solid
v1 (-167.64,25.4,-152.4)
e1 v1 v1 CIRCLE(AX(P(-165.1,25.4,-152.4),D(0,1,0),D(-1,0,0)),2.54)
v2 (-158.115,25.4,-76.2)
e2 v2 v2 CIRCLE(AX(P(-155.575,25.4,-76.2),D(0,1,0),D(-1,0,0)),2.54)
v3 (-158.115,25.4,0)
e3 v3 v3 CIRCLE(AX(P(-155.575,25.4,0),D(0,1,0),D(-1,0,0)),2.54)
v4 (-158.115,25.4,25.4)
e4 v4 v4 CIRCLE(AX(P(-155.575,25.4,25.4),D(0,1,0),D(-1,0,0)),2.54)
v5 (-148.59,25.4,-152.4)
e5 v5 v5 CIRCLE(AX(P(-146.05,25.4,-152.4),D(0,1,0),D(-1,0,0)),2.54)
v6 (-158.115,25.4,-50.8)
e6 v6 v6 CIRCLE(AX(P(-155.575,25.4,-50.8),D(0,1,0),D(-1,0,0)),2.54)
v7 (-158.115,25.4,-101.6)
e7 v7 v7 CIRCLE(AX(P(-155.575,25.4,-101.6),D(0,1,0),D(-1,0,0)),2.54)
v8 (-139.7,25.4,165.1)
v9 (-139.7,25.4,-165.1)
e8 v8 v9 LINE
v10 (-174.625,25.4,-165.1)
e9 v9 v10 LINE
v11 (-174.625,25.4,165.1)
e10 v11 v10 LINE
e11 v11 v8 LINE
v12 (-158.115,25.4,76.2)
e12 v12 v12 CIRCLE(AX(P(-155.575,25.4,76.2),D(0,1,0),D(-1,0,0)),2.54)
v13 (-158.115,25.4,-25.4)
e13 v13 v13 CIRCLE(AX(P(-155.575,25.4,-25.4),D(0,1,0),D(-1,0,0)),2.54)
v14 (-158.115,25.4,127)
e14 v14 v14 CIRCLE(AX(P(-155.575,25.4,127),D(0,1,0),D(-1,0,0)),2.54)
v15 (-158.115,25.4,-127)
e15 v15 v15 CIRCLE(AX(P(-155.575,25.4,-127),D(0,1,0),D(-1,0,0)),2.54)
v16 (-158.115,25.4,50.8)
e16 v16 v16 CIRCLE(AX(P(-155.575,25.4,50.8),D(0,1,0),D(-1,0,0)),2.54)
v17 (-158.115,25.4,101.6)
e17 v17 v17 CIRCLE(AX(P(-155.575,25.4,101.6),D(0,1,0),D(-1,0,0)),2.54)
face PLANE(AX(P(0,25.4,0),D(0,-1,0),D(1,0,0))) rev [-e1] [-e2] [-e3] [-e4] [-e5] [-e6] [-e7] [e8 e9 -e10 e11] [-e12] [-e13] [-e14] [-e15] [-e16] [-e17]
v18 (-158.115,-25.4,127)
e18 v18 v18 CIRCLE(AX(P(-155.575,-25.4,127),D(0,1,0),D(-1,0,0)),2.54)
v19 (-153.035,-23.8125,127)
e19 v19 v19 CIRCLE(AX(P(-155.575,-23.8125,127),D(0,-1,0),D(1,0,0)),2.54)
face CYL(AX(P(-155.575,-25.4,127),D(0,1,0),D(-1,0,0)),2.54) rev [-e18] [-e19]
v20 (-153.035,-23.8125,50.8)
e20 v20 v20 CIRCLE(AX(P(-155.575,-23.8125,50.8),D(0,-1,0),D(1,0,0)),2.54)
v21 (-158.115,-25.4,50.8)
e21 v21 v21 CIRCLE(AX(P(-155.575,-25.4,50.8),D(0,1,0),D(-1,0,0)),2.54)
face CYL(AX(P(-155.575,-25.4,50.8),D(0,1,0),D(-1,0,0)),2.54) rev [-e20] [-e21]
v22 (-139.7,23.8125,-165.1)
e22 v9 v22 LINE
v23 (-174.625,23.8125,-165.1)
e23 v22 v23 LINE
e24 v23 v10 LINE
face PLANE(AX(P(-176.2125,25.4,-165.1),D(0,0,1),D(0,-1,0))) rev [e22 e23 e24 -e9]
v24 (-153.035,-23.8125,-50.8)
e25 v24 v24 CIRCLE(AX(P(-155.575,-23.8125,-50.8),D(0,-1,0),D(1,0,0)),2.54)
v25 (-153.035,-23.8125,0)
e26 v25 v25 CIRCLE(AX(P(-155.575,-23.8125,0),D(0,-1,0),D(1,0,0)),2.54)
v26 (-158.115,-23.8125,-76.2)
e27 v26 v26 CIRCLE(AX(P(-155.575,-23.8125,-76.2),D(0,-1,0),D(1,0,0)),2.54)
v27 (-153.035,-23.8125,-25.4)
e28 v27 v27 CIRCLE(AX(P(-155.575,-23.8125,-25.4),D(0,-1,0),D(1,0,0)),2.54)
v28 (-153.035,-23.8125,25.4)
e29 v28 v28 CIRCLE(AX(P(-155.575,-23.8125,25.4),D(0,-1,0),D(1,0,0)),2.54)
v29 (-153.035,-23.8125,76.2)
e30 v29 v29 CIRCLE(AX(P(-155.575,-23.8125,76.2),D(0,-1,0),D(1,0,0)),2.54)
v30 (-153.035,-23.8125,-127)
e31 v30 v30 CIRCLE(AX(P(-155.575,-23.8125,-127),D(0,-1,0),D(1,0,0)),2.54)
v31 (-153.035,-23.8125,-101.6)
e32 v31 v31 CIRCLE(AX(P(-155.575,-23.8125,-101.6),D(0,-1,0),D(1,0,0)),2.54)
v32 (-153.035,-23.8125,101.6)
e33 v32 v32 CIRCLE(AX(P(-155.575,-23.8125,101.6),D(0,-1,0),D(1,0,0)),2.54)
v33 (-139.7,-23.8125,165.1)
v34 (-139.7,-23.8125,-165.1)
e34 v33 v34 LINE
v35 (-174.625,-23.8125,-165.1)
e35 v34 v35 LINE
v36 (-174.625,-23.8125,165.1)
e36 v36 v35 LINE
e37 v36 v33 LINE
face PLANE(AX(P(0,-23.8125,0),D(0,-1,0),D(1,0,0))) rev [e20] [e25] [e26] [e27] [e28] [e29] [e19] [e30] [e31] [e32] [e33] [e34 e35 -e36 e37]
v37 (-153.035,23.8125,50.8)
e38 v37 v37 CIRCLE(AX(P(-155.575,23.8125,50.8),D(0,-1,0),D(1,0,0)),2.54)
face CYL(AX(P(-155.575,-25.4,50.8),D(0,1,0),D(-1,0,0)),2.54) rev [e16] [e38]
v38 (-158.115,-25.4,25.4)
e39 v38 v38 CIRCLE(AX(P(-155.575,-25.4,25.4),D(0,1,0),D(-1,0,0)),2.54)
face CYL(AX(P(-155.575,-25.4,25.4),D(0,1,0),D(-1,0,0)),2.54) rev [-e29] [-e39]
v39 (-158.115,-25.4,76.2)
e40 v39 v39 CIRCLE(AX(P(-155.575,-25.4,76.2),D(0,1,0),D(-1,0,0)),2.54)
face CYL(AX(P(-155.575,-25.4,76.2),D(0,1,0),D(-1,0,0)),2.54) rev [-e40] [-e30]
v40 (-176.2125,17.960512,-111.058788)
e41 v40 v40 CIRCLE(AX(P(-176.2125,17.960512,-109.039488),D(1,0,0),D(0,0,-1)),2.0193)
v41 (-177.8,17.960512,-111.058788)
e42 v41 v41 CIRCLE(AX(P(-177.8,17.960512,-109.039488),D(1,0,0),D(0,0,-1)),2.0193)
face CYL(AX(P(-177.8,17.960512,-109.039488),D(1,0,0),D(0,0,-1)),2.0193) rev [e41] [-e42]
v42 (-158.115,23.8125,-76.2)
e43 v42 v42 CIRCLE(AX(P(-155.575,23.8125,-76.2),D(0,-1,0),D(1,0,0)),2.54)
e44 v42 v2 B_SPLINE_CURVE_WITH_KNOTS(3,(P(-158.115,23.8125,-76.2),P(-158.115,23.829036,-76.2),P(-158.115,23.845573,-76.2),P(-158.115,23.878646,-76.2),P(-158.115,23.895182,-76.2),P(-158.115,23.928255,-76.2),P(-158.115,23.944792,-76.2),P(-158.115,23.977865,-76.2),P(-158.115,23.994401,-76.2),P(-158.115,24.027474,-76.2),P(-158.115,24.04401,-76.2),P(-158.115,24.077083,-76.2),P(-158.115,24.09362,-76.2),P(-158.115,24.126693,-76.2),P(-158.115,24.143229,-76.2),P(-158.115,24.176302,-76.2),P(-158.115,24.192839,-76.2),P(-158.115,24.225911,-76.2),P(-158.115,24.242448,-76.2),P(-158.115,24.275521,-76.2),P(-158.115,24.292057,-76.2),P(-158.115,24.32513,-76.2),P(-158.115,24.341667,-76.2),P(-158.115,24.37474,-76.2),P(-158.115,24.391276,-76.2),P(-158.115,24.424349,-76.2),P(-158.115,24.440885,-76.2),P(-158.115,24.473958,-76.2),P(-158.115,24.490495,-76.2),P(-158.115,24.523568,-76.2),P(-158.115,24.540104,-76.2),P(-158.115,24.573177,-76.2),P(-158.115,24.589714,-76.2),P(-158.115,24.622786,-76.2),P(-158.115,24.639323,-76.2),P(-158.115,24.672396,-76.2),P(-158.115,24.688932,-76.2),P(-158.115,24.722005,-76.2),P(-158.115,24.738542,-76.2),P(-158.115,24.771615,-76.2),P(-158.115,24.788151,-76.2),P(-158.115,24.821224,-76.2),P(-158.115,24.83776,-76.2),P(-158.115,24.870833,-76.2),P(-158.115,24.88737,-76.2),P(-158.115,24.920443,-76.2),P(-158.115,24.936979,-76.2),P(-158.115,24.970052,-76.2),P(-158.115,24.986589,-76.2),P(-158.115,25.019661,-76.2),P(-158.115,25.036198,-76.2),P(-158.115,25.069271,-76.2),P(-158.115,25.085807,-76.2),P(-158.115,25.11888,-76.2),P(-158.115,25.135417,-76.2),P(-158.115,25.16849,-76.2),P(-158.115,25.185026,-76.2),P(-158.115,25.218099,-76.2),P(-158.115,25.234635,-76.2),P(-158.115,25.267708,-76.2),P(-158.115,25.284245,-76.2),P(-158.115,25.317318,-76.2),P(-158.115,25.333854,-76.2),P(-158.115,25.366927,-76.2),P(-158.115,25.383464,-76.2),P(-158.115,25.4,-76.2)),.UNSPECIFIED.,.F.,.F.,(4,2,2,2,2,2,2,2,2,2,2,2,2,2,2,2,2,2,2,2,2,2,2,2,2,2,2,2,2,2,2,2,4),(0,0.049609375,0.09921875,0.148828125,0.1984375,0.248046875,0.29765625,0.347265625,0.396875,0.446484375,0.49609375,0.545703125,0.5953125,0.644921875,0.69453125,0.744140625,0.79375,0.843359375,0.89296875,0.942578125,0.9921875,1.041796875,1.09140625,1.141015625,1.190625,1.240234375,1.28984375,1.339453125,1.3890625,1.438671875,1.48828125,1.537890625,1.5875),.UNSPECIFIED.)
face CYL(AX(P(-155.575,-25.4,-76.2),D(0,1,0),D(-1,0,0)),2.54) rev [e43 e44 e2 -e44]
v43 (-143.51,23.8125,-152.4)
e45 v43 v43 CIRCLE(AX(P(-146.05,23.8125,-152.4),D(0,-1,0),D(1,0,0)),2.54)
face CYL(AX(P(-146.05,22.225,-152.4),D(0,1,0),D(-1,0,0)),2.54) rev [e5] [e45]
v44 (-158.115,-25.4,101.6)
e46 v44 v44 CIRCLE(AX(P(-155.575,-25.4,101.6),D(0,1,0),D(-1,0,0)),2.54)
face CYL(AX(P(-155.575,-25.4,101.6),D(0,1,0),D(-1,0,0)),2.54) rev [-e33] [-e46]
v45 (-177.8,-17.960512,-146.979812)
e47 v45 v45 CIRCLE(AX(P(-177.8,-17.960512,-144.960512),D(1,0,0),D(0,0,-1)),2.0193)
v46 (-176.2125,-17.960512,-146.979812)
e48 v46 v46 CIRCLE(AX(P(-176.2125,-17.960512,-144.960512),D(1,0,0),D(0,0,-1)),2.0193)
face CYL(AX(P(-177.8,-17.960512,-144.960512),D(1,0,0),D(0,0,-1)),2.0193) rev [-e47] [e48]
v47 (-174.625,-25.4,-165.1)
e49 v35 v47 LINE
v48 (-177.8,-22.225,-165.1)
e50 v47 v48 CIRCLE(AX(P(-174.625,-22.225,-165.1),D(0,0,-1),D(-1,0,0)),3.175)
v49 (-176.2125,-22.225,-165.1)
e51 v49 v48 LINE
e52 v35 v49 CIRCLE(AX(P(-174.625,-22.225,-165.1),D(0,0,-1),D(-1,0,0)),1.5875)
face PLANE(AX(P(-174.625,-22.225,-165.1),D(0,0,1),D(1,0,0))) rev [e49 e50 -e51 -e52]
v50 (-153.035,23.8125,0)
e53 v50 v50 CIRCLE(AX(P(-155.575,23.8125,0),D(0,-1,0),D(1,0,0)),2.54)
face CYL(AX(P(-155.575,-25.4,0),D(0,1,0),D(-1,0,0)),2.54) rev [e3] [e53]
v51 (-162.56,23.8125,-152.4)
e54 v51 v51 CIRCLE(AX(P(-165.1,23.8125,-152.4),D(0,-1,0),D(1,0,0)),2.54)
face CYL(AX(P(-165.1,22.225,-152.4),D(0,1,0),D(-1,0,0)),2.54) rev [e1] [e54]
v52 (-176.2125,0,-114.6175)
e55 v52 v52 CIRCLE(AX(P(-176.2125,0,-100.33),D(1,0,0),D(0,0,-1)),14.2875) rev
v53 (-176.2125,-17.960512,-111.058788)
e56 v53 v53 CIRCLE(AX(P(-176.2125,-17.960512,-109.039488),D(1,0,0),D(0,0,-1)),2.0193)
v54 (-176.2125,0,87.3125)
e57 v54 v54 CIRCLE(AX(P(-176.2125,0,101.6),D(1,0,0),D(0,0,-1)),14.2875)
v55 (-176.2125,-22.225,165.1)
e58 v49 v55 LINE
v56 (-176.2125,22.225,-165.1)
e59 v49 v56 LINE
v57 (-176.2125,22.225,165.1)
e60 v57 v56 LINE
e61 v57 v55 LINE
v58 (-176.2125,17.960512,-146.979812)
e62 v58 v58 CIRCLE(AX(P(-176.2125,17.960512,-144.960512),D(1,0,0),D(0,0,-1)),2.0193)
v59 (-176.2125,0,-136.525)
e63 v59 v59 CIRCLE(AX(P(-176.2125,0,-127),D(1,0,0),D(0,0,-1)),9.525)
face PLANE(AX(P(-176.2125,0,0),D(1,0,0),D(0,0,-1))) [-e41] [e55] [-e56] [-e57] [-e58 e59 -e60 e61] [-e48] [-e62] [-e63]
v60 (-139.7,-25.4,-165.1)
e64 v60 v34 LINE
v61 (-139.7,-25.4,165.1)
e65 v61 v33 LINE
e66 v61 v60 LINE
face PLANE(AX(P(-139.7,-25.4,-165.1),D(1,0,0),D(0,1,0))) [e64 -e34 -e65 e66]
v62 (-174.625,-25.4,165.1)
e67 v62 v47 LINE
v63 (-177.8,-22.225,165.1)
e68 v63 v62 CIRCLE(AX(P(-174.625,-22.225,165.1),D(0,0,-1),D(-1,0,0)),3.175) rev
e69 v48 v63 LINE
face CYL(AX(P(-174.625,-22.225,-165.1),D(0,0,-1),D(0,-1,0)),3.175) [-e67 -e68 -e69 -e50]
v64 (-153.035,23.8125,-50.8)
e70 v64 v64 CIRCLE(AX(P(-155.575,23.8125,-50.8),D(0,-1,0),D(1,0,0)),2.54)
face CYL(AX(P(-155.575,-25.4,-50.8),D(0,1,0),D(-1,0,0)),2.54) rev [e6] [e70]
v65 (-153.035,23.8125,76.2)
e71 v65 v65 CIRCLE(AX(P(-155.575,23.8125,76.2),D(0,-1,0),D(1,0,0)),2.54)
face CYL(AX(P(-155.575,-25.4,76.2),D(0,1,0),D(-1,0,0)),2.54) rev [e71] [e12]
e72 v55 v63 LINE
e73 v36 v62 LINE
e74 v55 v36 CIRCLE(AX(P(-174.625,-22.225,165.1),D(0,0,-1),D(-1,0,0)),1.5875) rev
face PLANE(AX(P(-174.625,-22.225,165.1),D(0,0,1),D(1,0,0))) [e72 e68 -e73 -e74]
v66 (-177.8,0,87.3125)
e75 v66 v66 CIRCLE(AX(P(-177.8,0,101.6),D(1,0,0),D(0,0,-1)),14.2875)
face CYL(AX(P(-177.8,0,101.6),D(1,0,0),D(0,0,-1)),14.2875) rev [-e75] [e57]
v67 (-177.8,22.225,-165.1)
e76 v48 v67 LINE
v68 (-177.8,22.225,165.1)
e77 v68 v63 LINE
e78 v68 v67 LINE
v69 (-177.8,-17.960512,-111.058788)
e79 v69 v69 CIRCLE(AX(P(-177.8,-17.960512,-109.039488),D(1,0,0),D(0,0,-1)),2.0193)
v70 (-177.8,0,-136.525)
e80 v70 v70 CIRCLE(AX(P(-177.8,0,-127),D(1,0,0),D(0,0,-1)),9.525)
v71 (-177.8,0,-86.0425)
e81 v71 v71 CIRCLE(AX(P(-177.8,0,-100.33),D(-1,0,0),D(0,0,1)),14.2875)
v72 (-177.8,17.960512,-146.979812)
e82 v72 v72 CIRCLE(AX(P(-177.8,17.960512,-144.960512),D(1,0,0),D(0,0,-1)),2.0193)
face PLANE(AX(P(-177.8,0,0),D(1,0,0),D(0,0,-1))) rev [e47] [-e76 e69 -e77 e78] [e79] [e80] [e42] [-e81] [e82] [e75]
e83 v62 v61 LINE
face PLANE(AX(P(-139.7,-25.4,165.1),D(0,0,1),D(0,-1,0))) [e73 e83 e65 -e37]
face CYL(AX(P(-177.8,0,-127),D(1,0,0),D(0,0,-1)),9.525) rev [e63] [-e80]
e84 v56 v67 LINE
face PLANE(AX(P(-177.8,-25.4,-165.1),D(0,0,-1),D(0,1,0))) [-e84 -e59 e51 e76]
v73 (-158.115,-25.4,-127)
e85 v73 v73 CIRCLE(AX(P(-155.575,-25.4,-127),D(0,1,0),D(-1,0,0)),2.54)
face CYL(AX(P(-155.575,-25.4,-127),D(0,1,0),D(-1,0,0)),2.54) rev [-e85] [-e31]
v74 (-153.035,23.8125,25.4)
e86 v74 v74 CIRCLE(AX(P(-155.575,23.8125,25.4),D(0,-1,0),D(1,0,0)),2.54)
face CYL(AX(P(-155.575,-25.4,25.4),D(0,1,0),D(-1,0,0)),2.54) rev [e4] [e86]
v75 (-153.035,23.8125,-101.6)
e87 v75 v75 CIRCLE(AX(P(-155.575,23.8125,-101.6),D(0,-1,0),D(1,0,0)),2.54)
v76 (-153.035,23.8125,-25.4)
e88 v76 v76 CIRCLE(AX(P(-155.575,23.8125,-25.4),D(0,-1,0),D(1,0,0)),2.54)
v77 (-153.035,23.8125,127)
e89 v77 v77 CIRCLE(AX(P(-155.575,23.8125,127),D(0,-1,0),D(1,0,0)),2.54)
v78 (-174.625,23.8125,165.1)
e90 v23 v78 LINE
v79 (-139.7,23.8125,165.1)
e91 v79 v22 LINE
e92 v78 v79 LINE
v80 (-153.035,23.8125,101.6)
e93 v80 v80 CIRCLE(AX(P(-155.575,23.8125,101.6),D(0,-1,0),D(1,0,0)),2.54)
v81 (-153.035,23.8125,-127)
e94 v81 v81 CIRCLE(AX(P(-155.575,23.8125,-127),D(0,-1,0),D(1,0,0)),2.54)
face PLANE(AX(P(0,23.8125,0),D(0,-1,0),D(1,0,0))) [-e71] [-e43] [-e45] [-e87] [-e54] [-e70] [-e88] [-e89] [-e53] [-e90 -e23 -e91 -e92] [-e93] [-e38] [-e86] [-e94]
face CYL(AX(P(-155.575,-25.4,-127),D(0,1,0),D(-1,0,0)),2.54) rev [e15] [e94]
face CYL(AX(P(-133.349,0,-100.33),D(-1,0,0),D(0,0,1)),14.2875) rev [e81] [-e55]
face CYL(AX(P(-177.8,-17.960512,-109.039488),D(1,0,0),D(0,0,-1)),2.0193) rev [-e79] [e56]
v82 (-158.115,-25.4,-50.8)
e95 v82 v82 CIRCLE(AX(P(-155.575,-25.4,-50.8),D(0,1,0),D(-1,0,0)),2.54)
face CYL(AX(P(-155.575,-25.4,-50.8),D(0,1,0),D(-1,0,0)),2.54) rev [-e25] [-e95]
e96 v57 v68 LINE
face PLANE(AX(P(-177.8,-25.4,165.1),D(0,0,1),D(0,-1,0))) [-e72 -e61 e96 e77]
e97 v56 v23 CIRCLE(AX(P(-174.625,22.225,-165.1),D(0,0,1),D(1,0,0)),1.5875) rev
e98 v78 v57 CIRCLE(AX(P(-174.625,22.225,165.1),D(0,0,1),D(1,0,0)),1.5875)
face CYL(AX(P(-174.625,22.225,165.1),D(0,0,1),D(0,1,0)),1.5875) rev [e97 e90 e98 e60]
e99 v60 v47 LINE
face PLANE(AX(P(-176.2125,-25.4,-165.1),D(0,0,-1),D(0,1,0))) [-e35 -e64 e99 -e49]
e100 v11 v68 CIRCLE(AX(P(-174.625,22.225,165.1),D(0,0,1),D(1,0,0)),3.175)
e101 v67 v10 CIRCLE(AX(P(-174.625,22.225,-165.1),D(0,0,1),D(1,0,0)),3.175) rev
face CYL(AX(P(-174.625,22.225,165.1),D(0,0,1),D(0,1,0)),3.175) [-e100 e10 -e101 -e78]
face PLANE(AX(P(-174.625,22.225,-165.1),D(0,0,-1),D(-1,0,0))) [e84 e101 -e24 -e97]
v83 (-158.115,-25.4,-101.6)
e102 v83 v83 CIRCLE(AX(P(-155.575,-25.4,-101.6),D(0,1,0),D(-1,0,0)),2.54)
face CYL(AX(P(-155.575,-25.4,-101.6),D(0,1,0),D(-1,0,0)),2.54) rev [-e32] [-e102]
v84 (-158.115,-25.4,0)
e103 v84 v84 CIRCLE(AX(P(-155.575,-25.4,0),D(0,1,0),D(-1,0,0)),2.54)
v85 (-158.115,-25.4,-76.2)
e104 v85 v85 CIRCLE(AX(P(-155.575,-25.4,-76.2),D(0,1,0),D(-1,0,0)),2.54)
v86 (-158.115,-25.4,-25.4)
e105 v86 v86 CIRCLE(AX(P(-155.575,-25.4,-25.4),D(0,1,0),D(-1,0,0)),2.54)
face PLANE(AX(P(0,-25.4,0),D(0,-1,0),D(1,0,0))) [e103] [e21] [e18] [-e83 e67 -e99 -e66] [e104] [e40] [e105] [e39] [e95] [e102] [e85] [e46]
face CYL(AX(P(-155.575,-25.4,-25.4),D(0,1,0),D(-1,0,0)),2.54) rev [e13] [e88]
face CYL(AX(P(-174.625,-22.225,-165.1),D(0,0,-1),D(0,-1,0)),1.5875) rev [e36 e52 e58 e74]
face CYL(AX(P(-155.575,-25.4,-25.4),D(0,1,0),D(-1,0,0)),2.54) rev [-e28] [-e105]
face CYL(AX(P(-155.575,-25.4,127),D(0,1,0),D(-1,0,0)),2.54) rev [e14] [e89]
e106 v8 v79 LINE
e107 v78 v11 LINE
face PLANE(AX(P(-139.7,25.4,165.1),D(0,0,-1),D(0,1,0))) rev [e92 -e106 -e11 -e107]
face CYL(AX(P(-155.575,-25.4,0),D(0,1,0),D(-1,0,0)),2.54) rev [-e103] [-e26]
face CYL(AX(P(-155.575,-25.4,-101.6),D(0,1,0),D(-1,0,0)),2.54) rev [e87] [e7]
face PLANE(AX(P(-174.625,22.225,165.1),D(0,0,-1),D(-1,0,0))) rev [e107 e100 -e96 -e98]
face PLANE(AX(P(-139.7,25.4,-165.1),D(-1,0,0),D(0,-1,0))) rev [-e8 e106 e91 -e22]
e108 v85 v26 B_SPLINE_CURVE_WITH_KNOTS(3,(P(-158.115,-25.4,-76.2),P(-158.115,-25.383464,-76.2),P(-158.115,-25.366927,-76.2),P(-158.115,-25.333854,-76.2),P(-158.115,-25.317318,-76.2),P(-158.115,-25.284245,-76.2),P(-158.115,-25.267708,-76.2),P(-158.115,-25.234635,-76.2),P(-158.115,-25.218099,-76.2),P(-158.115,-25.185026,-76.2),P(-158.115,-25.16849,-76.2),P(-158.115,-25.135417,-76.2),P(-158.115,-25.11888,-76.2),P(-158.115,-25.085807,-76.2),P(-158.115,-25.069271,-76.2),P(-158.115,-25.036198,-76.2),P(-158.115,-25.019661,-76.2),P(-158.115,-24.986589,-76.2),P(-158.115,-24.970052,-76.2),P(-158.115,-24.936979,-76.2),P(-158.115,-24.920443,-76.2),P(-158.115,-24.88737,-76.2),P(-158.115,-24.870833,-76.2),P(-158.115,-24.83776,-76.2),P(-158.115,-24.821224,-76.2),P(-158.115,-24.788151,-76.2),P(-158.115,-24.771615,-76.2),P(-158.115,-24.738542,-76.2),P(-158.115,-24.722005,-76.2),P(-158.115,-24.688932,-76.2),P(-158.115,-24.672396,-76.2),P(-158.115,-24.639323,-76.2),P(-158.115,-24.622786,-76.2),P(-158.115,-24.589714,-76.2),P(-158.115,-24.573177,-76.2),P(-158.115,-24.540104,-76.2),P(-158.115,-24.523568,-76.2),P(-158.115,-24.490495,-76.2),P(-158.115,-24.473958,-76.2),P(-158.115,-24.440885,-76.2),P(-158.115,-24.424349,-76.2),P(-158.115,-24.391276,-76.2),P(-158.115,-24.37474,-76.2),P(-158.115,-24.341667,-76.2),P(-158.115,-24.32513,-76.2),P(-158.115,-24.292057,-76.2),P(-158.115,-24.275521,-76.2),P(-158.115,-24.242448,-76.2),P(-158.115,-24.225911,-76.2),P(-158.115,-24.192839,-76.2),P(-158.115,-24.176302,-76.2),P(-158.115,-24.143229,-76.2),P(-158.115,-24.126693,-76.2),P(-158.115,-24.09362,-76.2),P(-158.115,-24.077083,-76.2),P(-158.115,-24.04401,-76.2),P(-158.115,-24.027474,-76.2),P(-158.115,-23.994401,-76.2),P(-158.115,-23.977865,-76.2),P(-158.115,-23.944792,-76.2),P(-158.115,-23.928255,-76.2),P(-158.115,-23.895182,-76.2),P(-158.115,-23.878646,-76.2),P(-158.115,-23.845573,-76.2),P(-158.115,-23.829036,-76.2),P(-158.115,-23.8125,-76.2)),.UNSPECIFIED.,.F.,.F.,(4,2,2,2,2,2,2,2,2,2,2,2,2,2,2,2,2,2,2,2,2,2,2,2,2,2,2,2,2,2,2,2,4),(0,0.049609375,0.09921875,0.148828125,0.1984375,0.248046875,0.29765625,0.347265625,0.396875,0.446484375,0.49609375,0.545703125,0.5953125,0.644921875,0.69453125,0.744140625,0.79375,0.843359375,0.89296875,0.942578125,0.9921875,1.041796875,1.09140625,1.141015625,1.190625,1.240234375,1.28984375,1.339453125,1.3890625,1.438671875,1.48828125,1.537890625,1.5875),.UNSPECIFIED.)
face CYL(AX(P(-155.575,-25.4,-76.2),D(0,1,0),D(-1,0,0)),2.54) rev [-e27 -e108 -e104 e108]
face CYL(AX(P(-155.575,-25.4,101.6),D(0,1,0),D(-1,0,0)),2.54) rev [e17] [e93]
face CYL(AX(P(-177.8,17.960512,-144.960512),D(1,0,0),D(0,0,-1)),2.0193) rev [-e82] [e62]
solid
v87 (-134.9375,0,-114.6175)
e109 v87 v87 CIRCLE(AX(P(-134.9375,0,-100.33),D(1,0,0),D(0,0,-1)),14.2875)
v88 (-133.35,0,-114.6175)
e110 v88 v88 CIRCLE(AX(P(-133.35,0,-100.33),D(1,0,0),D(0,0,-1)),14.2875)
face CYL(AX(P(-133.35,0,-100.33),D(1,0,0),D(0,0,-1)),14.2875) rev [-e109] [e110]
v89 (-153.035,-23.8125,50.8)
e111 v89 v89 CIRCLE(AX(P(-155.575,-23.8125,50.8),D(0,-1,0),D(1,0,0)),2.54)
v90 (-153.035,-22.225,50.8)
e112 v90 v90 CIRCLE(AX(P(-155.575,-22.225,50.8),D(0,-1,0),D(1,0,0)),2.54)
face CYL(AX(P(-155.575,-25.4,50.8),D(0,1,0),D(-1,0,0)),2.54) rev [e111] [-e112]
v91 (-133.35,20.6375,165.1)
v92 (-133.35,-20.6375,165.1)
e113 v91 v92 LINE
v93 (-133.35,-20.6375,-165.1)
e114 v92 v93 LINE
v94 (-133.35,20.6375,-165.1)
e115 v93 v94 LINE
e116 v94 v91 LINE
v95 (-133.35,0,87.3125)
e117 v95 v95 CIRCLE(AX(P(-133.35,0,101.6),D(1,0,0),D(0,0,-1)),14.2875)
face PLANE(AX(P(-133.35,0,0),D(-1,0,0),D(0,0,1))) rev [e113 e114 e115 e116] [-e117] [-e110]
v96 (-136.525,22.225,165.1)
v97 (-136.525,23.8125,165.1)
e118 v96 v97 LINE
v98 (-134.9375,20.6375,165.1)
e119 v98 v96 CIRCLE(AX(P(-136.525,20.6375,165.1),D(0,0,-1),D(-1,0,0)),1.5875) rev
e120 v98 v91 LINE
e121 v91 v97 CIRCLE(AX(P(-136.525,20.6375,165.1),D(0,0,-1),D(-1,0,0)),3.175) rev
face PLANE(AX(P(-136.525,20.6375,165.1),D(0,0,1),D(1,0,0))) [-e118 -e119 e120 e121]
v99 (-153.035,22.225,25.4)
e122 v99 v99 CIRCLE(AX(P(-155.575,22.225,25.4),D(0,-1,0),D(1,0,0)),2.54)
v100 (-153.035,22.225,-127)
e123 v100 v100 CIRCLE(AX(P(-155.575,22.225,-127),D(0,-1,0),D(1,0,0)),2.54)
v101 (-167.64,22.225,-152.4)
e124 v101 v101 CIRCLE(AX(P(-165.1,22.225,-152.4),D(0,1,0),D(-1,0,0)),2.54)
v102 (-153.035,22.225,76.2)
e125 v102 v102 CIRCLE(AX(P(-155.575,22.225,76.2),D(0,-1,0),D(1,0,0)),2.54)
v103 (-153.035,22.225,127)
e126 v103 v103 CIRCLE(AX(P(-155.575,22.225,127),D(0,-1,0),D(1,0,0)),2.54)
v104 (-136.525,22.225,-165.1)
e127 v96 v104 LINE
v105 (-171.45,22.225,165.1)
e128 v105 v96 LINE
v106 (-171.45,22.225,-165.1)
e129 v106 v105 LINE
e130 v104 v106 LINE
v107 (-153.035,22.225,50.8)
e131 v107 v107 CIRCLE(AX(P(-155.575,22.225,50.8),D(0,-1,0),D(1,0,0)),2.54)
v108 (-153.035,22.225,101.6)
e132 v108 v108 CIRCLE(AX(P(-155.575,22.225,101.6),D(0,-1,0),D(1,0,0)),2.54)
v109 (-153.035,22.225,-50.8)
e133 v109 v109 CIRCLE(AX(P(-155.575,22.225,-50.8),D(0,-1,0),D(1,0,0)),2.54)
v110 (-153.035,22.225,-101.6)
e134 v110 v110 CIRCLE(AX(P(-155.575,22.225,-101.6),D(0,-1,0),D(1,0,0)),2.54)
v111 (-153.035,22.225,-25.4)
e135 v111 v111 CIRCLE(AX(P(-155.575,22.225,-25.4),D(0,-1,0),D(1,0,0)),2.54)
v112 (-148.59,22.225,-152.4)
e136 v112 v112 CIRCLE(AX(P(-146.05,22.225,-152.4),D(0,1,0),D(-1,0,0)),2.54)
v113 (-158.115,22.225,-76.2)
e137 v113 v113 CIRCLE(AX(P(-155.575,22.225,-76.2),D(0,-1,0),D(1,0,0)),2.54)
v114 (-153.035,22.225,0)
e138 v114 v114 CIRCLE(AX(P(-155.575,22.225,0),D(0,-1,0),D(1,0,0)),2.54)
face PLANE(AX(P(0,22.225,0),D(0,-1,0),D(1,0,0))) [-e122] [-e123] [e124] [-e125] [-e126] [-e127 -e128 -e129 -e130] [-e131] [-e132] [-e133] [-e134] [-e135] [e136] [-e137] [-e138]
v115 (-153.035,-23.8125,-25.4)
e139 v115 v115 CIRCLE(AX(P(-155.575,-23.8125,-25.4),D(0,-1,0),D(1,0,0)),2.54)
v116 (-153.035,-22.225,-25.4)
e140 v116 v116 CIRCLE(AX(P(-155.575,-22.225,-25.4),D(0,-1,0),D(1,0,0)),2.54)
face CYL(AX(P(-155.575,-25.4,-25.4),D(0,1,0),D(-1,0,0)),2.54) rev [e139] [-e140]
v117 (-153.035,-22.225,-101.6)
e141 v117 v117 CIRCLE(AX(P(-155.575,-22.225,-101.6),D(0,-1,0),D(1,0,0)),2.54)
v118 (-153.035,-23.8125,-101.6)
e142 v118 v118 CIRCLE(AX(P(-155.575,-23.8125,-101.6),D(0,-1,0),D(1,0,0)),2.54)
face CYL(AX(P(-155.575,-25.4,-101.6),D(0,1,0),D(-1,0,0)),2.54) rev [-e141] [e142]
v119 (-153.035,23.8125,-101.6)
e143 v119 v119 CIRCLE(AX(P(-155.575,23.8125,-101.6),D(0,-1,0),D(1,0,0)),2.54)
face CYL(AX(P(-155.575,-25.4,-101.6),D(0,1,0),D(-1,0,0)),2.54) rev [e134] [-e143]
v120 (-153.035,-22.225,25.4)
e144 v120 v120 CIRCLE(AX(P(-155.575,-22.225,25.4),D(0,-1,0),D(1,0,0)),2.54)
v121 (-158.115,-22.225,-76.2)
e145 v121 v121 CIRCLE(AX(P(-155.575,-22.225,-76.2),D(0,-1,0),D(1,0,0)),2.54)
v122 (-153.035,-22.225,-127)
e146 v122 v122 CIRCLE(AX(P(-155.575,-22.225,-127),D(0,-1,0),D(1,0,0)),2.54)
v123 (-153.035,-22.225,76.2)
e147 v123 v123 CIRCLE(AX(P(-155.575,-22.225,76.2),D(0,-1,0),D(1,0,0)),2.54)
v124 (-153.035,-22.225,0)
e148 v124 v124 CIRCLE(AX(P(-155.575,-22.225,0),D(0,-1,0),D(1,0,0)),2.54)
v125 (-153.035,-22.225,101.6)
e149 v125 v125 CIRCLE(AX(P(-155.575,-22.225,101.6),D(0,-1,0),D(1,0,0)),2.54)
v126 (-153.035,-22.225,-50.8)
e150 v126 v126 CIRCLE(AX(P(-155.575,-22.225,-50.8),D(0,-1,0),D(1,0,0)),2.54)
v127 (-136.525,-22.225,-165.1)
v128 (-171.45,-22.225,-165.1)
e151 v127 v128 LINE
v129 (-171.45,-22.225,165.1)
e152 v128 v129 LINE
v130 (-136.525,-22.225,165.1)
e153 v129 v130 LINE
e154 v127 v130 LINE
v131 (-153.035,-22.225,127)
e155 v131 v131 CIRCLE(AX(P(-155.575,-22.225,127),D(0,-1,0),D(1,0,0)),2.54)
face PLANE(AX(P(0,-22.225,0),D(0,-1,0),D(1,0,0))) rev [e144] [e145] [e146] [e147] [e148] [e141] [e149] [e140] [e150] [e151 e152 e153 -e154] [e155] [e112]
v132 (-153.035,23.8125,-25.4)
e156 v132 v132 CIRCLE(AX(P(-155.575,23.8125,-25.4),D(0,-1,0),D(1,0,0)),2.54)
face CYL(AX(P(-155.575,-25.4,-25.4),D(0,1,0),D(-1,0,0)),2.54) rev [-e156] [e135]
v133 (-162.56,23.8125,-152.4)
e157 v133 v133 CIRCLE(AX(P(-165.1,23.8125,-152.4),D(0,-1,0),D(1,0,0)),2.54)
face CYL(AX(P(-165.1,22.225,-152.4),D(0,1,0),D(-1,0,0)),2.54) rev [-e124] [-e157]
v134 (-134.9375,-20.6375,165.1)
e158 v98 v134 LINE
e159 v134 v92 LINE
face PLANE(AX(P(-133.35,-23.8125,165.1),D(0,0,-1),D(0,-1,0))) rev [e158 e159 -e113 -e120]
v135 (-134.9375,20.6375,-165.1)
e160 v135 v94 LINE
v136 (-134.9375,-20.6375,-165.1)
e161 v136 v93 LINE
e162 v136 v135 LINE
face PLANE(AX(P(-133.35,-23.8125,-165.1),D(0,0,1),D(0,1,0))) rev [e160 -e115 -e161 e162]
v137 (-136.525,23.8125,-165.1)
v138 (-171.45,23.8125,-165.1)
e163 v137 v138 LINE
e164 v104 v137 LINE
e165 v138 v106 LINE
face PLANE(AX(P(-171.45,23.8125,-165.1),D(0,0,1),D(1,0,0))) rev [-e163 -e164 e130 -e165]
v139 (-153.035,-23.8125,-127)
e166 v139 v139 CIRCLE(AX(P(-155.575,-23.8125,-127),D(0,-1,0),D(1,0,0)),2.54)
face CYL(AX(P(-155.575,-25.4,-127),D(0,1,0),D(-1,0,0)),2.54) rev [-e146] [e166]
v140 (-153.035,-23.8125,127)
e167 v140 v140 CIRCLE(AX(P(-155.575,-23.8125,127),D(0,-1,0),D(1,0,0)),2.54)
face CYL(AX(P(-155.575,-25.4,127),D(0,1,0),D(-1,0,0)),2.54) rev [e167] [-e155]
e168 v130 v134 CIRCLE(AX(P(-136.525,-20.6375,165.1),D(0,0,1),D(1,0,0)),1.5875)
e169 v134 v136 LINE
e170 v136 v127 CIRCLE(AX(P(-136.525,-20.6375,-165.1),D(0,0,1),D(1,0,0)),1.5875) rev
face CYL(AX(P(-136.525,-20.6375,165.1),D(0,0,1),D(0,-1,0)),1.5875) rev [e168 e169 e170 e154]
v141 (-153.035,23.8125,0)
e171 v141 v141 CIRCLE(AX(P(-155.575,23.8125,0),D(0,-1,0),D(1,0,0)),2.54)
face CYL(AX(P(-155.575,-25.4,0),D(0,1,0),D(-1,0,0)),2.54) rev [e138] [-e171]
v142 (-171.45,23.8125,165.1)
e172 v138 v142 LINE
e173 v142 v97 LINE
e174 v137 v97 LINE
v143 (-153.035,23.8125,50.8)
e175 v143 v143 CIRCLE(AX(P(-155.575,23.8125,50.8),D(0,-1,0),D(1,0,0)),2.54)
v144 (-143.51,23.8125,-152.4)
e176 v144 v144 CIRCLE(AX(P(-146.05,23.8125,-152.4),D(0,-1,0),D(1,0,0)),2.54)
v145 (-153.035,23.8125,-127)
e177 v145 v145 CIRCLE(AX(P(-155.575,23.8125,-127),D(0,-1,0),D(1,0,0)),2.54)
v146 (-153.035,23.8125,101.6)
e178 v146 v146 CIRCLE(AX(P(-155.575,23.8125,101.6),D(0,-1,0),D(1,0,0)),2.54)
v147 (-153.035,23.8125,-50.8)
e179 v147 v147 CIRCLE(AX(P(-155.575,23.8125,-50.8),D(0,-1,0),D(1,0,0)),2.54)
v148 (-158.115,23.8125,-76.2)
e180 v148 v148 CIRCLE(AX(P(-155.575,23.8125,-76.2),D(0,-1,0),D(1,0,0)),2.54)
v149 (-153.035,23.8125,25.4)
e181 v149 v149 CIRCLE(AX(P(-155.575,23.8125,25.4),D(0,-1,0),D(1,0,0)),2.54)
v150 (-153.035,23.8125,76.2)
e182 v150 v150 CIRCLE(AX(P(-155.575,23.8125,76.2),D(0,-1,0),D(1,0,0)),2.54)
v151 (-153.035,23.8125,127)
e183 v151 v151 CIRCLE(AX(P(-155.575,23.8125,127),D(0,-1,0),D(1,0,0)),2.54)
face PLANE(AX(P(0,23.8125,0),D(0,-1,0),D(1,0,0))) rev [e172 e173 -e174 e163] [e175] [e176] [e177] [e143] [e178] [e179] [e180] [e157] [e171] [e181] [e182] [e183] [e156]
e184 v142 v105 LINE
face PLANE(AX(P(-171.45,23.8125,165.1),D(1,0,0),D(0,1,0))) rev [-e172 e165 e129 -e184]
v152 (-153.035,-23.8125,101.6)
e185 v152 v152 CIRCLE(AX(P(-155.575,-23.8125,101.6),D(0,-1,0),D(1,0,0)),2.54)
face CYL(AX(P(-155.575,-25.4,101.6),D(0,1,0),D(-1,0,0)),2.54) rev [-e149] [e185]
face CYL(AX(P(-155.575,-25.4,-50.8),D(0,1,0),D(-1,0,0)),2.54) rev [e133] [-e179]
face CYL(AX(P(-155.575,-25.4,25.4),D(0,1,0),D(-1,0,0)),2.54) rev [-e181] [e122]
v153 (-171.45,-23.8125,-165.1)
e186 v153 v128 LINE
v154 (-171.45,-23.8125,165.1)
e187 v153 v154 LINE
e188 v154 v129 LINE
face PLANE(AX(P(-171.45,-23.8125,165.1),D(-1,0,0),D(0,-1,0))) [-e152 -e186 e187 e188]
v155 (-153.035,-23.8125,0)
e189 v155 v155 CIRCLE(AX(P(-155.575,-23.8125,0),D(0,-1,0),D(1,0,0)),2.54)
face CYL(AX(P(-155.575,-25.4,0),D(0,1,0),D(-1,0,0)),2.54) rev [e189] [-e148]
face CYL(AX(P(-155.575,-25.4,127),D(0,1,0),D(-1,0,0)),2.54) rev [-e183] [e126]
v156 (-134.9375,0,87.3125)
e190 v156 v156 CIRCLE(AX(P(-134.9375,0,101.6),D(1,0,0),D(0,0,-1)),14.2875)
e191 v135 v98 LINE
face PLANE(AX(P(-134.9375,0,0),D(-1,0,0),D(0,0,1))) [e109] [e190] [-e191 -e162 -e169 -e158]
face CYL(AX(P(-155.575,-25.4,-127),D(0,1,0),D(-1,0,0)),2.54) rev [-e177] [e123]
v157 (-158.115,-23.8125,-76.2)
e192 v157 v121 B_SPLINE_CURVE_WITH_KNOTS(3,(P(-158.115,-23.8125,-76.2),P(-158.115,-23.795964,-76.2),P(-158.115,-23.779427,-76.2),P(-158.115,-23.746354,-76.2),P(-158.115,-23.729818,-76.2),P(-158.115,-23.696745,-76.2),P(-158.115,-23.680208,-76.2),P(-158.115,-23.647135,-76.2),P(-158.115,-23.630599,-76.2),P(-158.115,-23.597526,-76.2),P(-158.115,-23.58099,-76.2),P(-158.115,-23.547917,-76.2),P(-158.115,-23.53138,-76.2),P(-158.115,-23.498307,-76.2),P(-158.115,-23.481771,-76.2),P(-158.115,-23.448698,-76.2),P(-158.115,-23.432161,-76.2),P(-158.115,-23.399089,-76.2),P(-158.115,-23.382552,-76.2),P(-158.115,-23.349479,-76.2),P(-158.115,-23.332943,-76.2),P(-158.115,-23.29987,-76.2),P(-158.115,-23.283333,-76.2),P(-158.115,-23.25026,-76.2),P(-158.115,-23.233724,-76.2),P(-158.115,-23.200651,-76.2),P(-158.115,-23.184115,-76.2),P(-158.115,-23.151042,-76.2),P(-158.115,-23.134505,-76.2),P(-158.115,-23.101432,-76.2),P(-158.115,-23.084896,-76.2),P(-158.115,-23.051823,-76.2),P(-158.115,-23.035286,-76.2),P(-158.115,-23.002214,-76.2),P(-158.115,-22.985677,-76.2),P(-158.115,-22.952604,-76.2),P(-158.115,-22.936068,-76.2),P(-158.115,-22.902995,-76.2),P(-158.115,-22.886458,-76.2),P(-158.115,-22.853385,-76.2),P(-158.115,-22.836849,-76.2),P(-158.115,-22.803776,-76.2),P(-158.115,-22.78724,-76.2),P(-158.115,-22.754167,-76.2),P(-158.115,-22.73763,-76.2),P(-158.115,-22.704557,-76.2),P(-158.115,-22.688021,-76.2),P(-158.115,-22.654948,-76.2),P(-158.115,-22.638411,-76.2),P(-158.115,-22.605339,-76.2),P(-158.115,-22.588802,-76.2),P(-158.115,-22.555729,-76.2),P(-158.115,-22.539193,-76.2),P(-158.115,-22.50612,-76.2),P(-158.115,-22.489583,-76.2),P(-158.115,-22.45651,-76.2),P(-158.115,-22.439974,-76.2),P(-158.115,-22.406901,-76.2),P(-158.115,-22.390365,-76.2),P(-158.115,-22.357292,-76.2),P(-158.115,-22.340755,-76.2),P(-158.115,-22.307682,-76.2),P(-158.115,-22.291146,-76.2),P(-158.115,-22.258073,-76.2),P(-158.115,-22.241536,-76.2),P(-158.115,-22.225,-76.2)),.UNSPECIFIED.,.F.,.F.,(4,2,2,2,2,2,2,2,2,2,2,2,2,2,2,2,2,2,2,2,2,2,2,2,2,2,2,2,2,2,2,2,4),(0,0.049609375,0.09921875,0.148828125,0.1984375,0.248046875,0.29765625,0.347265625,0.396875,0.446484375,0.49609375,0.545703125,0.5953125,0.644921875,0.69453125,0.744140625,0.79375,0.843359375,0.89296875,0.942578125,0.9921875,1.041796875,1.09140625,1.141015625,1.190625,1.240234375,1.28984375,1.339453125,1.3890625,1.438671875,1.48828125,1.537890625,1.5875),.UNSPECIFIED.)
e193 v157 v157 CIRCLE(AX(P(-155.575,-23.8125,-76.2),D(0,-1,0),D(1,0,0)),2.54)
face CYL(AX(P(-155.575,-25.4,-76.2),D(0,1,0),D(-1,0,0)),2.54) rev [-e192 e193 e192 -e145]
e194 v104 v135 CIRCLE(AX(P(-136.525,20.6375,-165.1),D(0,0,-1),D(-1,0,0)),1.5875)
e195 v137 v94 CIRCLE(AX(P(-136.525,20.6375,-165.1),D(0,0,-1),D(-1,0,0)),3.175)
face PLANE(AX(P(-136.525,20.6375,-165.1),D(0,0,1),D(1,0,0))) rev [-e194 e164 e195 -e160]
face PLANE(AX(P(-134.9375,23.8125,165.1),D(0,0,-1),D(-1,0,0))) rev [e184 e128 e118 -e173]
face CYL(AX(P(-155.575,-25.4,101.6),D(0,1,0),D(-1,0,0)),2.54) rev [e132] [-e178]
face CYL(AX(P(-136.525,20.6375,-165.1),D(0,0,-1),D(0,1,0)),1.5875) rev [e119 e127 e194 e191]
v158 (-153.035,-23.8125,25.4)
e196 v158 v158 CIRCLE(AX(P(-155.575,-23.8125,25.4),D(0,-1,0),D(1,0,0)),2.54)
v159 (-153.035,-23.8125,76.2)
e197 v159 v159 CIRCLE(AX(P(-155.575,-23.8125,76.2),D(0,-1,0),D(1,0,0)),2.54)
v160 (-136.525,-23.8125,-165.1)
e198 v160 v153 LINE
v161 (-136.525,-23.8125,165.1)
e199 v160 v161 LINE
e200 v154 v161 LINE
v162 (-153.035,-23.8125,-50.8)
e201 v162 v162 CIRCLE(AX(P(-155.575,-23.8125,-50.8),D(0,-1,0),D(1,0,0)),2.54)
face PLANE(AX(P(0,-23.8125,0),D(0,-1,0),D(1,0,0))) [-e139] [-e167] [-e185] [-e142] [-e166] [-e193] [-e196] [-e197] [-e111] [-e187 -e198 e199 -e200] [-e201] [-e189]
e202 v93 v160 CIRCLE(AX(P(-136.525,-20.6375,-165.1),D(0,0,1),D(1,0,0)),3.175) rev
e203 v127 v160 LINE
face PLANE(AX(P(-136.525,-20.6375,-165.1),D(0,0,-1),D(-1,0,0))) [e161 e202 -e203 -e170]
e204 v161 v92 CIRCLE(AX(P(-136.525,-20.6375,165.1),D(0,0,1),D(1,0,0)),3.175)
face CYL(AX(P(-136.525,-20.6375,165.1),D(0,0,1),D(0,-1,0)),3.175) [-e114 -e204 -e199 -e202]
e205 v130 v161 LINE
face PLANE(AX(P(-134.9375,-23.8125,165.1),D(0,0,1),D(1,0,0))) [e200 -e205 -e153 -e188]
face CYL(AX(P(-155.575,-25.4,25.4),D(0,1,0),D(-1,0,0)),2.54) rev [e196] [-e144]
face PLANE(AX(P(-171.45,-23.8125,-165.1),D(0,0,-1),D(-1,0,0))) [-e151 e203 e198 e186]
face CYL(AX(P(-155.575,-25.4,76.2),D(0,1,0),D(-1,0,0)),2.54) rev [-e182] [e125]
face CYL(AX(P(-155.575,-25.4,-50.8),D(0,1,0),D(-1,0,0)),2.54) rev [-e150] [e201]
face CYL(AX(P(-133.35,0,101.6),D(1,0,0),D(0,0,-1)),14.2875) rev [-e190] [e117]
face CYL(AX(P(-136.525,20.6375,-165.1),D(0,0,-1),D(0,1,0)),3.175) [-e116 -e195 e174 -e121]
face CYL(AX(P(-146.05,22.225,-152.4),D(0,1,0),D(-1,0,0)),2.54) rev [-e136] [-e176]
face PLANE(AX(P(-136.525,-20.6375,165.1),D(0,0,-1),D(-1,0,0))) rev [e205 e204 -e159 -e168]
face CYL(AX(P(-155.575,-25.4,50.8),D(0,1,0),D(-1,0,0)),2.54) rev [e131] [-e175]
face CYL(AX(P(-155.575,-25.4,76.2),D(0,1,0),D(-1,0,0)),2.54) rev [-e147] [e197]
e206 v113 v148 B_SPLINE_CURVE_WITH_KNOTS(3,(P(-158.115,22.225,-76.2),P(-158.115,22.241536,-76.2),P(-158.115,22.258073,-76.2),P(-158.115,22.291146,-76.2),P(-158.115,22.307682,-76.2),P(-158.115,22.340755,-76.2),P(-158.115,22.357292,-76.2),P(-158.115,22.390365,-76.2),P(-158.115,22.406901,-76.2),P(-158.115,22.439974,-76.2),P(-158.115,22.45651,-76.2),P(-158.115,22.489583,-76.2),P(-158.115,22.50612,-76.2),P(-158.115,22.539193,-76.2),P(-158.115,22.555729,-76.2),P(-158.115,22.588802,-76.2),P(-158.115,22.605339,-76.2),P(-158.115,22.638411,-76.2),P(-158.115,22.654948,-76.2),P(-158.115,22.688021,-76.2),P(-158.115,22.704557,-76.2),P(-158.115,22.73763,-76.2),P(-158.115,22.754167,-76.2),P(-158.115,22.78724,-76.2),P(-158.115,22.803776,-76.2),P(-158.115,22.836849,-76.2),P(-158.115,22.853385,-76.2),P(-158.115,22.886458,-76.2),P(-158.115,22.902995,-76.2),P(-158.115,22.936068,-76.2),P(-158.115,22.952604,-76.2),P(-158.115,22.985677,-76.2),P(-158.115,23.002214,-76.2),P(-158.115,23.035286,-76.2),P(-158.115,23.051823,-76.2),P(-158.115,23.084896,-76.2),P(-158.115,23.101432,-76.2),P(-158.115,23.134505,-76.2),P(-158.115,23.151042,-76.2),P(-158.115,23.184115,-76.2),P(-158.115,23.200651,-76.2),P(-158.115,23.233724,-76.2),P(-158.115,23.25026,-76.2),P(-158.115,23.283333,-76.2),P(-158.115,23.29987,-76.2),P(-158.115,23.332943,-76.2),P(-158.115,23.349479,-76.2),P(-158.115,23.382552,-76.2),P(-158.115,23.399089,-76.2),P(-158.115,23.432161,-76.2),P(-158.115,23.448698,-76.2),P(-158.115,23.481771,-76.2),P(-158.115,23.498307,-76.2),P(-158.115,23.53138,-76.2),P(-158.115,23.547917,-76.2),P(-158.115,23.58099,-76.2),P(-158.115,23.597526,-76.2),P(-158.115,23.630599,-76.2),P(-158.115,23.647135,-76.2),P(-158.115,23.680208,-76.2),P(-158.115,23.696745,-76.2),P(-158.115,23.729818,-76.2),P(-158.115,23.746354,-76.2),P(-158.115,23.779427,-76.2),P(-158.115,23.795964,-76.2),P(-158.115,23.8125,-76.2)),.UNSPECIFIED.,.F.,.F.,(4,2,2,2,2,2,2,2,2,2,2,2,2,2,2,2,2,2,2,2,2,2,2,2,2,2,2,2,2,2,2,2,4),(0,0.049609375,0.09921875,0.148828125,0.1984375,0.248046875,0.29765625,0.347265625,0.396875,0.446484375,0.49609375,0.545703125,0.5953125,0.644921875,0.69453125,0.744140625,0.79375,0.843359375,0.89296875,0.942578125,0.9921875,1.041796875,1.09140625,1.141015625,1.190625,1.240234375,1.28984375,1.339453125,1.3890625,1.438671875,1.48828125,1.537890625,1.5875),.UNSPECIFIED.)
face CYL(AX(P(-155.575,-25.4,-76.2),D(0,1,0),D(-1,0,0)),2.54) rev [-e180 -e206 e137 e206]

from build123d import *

# Parameters (mm, degrees)
SKETCH1_W                    = 330.2
SKETCH1_H                    = 50.8
SKETCH1_R                    = 14.2875
SKETCH1_R_2                  = 2.0193
SKETCH1_R_3                  = 9.525
BOSS_EXTRUDE1_DEPTH          = 1.5875
EDGE_FLANGE1_STRIP_W         = 9.525
EDGE_FLANGE1_STRIP_H         = 1.5875
EDGE_FLANGE1_STRIP_CUT_DEPTH = 330.2
EDGE_FLANGE1_DEPTH           = 330.2
EDGE_FLANGE2_STRIP_W         = 9.525
EDGE_FLANGE2_STRIP_H         = 1.5875
EDGE_FLANGE2_STRIP_CUT_DEPTH = 330.2
EDGE_FLANGE2_DEPTH           = 330.2
SKETCH12_W                   = 330.2
SKETCH12_H                   = 47.625
SKETCH12_R                   = 14.2875
BOSS_EXTRUDE2_DEPTH          = 1.5875
EDGE_FLANGE3_STRIP_W         = 9.525
EDGE_FLANGE3_STRIP_H         = 1.5875
EDGE_FLANGE3_STRIP_CUT_DEPTH = 330.2
EDGE_FLANGE3_DEPTH           = 330.2
EDGE_FLANGE4_STRIP_W         = 9.525
EDGE_FLANGE4_STRIP_H         = 1.5875
EDGE_FLANGE4_STRIP_CUT_DEPTH = 330.2
EDGE_FLANGE4_DEPTH           = 330.2
SKETCH54_R                   = 2.54
CUT_EXTRUDE2_DEPTH           = 248.894110458
LPATTERN1_COUNT              = 6
LPATTERN1_PITCH              = 25.4
LPATTERN2_COUNT              = 6
LPATTERN2_PITCH              = 25.4
SKETCH53_R                   = 2.54
CUT_EXTRUDE3_DEPTH           = 3.175
SKETCH55_R                   = 14.2875
CUT_EXTRUDE4_DEPTH           = 1.5875


# Sheet-metal steps are written as plain solids
with BuildPart() as part:
    # Sketch1 → Boss-Extrude1 (new body)
    with BuildSketch(Plane(origin=(-177.8, 0, 0), x_dir=(0, 0, -1), z_dir=(1, 0, 0))):
        Rectangle(SKETCH1_W, SKETCH1_H)
        with Locations((-101.6, 0)):
            Circle(SKETCH1_R, mode=Mode.SUBTRACT)
        with Locations((144.960512242, 17.960512242)):
            Circle(SKETCH1_R_2, mode=Mode.SUBTRACT)
        with Locations((144.960512242, -17.960512242)):
            Circle(SKETCH1_R_2, mode=Mode.SUBTRACT)
        with Locations((109.039487758, 17.960512242)):
            Circle(SKETCH1_R_2, mode=Mode.SUBTRACT)
        with Locations((109.039487758, -17.960512242)):
            Circle(SKETCH1_R_2, mode=Mode.SUBTRACT)
        with Locations((127, 0)):
            Circle(SKETCH1_R_3, mode=Mode.SUBTRACT)
    extrude(amount=BOSS_EXTRUDE1_DEPTH)

    # Edge-Flange1 strip (across the edge) → Edge-Flange1 strip cut (cut)
    with BuildSketch(Plane(origin=(-176.2125, 25.4, -165.1), x_dir=(0, -1, 0), z_dir=(0, 0, 1))):
        with Locations((-1.5875, -0.79375)):
            Rectangle(EDGE_FLANGE1_STRIP_W, EDGE_FLANGE1_STRIP_H)
    extrude(amount=EDGE_FLANGE1_STRIP_CUT_DEPTH, mode=Mode.SUBTRACT)

    # Edge-Flange1 section (across the edge) → Edge-Flange1 (add)
    with BuildSketch(Plane(origin=(-176.2125, 25.4, -165.1), x_dir=(0, -1, 0), z_dir=(0, 0, 1))):
        with BuildLine():
            Line((0, 1.5875), (0, 36.5125))
            Line((0, 36.5125), (1.5875, 36.5125))
            Line((1.5875, 36.5125), (1.5875, 1.5875))
            ThreePointArc((1.5875, 1.5875), (2.052467985, 0.464967985), (3.175, 0))
            Line((3.175, 0), (3.175, -1.5875))
            ThreePointArc((3.175, -1.5875), (0.92993597, -0.65756403), (0, 1.5875))
        make_face()
    extrude(amount=EDGE_FLANGE1_DEPTH)

    # Edge-Flange2 strip (across the edge) → Edge-Flange2 strip cut (cut)
    with BuildSketch(Plane(origin=(-176.2125, -25.4, 165.1), x_dir=(0, 1, 0), z_dir=(0, 0, -1))):
        with Locations((-1.5875, -0.79375)):
            Rectangle(EDGE_FLANGE2_STRIP_W, EDGE_FLANGE2_STRIP_H)
    extrude(amount=EDGE_FLANGE2_STRIP_CUT_DEPTH, mode=Mode.SUBTRACT)

    # Edge-Flange2 section (across the edge) → Edge-Flange2 (add)
    with BuildSketch(Plane(origin=(-176.2125, -25.4, 165.1), x_dir=(0, 1, 0), z_dir=(0, 0, -1))):
        with BuildLine():
            Line((0, 1.5875), (0, 36.5125))
            Line((0, 36.5125), (1.5875, 36.5125))
            Line((1.5875, 36.5125), (1.5875, 1.5875))
            ThreePointArc((1.5875, 1.5875), (2.052467985, 0.464967985), (3.175, 0))
            Line((3.175, 0), (3.175, -1.5875))
            ThreePointArc((3.175, -1.5875), (0.92993597, -0.65756403), (0, 1.5875))
        make_face()
    extrude(amount=EDGE_FLANGE2_DEPTH)


with BuildPart() as body_2:
    # Sketch12 → Boss-Extrude2 (new body)
    with BuildSketch(Plane(origin=(-133.35, 0, 0), x_dir=(0, 0, -1), z_dir=(1, 0, 0))):
        Rectangle(SKETCH12_W, SKETCH12_H)
        with Locations((-101.6, 0)):
            Circle(SKETCH12_R, mode=Mode.SUBTRACT)
        with Locations((100.33, 0)):
            Circle(SKETCH12_R, mode=Mode.SUBTRACT)
    extrude(amount=-BOSS_EXTRUDE2_DEPTH)

    # Edge-Flange3 strip (across the edge) → Edge-Flange3 strip cut (cut)
    with BuildSketch(Plane(origin=(-134.9375, 23.8125, 165.1), x_dir=(0, -1, 0), z_dir=(0, 0, -1))):
        with Locations((-1.5875, -0.79375)):
            Rectangle(EDGE_FLANGE3_STRIP_W, EDGE_FLANGE3_STRIP_H)
    extrude(amount=EDGE_FLANGE3_STRIP_CUT_DEPTH, mode=Mode.SUBTRACT)

    # Edge-Flange3 section (across the edge) → Edge-Flange3 (add)
    with BuildSketch(Plane(origin=(-134.9375, 23.8125, 165.1), x_dir=(0, -1, 0), z_dir=(0, 0, -1))):
        with BuildLine():
            Line((0, 1.5875), (0, 36.5125))
            Line((0, 36.5125), (1.5875, 36.5125))
            Line((1.5875, 36.5125), (1.5875, 1.5875))
            ThreePointArc((1.5875, 1.5875), (2.052467985, 0.464967985), (3.175, 0))
            Line((3.175, 0), (3.175, -1.5875))
            ThreePointArc((3.175, -1.5875), (0.92993597, -0.65756403), (0, 1.5875))
        make_face()
    extrude(amount=EDGE_FLANGE3_DEPTH)

    # Edge-Flange4 strip (across the edge) → Edge-Flange4 strip cut (cut)
    with BuildSketch(Plane(origin=(-134.9375, -23.8125, -165.1), x_dir=(0, 1, 0), z_dir=(0, 0, 1))):
        with Locations((-1.5875, -0.79375)):
            Rectangle(EDGE_FLANGE4_STRIP_W, EDGE_FLANGE4_STRIP_H)
    extrude(amount=EDGE_FLANGE4_STRIP_CUT_DEPTH, mode=Mode.SUBTRACT)

    # Edge-Flange4 section (across the edge) → Edge-Flange4 (add)
    with BuildSketch(Plane(origin=(-134.9375, -23.8125, -165.1), x_dir=(0, 1, 0), z_dir=(0, 0, 1))):
        with BuildLine():
            Line((0, 1.5875), (0, 36.5125))
            Line((0, 36.5125), (1.5875, 36.5125))
            Line((1.5875, 36.5125), (1.5875, 1.5875))
            ThreePointArc((1.5875, 1.5875), (2.052467985, 0.464967985), (3.175, 0))
            Line((3.175, 0), (3.175, -1.5875))
            ThreePointArc((3.175, -1.5875), (0.92993597, -0.65756403), (0, 1.5875))
        make_face()
    extrude(amount=EDGE_FLANGE4_DEPTH)


with BuildPart() as cut_extrude2_tool:
    # Sketch54 → Cut-Extrude2 (new, through all)
    with BuildSketch(Plane(origin=(0, 25.4, 0), x_dir=(1, 0, 0), z_dir=(0, 1, 0))):
        with Locations((-155.575, 0)):
            Circle(SKETCH54_R)
    cut_extrude2 = extrude(amount=-CUT_EXTRUDE2_DEPTH)


with BuildPart() as part_1:
    add(part.part)

    # Cut-Extrude2: cut by cut_extrude2_tool
    add(cut_extrude2_tool.part, mode=Mode.SUBTRACT)


with BuildPart() as body_2_1:
    add(body_2.part)

    # Cut-Extrude2: cut by cut_extrude2_tool
    add(cut_extrude2_tool.part, mode=Mode.SUBTRACT)


with BuildPart() as lpattern1_tool:
    # LPattern1: Cut-Extrude2 ×6
    with Locations(*[(0, 0, -i * LPATTERN1_PITCH) for i in range(1, LPATTERN1_COUNT)]):
        add(cut_extrude2)


with BuildPart() as part_2:
    add(part_1.part)

    # LPattern1: cut by lpattern1_tool
    add(lpattern1_tool.part, mode=Mode.SUBTRACT)


with BuildPart() as body_2_2:
    add(body_2_1.part)

    # LPattern1: cut by lpattern1_tool
    add(lpattern1_tool.part, mode=Mode.SUBTRACT)


with BuildPart() as lpattern2_tool:
    # LPattern2: Cut-Extrude2 ×6
    with Locations(*[(0, 0, i * LPATTERN2_PITCH) for i in range(1, LPATTERN2_COUNT)]):
        add(cut_extrude2)


with BuildPart() as part_3:
    add(part_2.part)

    # LPattern2: cut by lpattern2_tool
    add(lpattern2_tool.part, mode=Mode.SUBTRACT)


with BuildPart() as body_2_3:
    add(body_2_2.part)

    # LPattern2: cut by lpattern2_tool
    add(lpattern2_tool.part, mode=Mode.SUBTRACT)


with BuildPart() as cut_extrude3_tool:
    # Sketch53 → Cut-Extrude3 (new body)
    with BuildSketch(Plane(origin=(0, 25.4, 0), x_dir=(1, 0, 0), z_dir=(0, 1, 0))):
        with Locations(Location((-165.1, 152.4, 0), (0, 0, 180))):
            Circle(SKETCH53_R)
        with Locations(Location((-146.05, 152.4, 0), (0, 0, 180))):
            Circle(SKETCH53_R)
    extrude(amount=-CUT_EXTRUDE3_DEPTH)


with BuildPart() as part_4:
    add(part_3.part)

    # Cut-Extrude3: cut by cut_extrude3_tool
    add(cut_extrude3_tool.part, mode=Mode.SUBTRACT)

    # Sketch55 → Cut-Extrude4 (cut)
    with BuildSketch(Plane.ZY.offset(177.8)):
        with Locations(Location((-100.33, 0, 0), (0, 0, 180))):
            Circle(SKETCH55_R)
    extrude(amount=-CUT_EXTRUDE4_DEPTH, mode=Mode.SUBTRACT)


with BuildPart() as body_2_4:
    add(body_2_3.part)

    # Cut-Extrude3: cut by cut_extrude3_tool
    add(cut_extrude3_tool.part, mode=Mode.SUBTRACT)


solid = Compound([part_4.part, body_2_4.part])
